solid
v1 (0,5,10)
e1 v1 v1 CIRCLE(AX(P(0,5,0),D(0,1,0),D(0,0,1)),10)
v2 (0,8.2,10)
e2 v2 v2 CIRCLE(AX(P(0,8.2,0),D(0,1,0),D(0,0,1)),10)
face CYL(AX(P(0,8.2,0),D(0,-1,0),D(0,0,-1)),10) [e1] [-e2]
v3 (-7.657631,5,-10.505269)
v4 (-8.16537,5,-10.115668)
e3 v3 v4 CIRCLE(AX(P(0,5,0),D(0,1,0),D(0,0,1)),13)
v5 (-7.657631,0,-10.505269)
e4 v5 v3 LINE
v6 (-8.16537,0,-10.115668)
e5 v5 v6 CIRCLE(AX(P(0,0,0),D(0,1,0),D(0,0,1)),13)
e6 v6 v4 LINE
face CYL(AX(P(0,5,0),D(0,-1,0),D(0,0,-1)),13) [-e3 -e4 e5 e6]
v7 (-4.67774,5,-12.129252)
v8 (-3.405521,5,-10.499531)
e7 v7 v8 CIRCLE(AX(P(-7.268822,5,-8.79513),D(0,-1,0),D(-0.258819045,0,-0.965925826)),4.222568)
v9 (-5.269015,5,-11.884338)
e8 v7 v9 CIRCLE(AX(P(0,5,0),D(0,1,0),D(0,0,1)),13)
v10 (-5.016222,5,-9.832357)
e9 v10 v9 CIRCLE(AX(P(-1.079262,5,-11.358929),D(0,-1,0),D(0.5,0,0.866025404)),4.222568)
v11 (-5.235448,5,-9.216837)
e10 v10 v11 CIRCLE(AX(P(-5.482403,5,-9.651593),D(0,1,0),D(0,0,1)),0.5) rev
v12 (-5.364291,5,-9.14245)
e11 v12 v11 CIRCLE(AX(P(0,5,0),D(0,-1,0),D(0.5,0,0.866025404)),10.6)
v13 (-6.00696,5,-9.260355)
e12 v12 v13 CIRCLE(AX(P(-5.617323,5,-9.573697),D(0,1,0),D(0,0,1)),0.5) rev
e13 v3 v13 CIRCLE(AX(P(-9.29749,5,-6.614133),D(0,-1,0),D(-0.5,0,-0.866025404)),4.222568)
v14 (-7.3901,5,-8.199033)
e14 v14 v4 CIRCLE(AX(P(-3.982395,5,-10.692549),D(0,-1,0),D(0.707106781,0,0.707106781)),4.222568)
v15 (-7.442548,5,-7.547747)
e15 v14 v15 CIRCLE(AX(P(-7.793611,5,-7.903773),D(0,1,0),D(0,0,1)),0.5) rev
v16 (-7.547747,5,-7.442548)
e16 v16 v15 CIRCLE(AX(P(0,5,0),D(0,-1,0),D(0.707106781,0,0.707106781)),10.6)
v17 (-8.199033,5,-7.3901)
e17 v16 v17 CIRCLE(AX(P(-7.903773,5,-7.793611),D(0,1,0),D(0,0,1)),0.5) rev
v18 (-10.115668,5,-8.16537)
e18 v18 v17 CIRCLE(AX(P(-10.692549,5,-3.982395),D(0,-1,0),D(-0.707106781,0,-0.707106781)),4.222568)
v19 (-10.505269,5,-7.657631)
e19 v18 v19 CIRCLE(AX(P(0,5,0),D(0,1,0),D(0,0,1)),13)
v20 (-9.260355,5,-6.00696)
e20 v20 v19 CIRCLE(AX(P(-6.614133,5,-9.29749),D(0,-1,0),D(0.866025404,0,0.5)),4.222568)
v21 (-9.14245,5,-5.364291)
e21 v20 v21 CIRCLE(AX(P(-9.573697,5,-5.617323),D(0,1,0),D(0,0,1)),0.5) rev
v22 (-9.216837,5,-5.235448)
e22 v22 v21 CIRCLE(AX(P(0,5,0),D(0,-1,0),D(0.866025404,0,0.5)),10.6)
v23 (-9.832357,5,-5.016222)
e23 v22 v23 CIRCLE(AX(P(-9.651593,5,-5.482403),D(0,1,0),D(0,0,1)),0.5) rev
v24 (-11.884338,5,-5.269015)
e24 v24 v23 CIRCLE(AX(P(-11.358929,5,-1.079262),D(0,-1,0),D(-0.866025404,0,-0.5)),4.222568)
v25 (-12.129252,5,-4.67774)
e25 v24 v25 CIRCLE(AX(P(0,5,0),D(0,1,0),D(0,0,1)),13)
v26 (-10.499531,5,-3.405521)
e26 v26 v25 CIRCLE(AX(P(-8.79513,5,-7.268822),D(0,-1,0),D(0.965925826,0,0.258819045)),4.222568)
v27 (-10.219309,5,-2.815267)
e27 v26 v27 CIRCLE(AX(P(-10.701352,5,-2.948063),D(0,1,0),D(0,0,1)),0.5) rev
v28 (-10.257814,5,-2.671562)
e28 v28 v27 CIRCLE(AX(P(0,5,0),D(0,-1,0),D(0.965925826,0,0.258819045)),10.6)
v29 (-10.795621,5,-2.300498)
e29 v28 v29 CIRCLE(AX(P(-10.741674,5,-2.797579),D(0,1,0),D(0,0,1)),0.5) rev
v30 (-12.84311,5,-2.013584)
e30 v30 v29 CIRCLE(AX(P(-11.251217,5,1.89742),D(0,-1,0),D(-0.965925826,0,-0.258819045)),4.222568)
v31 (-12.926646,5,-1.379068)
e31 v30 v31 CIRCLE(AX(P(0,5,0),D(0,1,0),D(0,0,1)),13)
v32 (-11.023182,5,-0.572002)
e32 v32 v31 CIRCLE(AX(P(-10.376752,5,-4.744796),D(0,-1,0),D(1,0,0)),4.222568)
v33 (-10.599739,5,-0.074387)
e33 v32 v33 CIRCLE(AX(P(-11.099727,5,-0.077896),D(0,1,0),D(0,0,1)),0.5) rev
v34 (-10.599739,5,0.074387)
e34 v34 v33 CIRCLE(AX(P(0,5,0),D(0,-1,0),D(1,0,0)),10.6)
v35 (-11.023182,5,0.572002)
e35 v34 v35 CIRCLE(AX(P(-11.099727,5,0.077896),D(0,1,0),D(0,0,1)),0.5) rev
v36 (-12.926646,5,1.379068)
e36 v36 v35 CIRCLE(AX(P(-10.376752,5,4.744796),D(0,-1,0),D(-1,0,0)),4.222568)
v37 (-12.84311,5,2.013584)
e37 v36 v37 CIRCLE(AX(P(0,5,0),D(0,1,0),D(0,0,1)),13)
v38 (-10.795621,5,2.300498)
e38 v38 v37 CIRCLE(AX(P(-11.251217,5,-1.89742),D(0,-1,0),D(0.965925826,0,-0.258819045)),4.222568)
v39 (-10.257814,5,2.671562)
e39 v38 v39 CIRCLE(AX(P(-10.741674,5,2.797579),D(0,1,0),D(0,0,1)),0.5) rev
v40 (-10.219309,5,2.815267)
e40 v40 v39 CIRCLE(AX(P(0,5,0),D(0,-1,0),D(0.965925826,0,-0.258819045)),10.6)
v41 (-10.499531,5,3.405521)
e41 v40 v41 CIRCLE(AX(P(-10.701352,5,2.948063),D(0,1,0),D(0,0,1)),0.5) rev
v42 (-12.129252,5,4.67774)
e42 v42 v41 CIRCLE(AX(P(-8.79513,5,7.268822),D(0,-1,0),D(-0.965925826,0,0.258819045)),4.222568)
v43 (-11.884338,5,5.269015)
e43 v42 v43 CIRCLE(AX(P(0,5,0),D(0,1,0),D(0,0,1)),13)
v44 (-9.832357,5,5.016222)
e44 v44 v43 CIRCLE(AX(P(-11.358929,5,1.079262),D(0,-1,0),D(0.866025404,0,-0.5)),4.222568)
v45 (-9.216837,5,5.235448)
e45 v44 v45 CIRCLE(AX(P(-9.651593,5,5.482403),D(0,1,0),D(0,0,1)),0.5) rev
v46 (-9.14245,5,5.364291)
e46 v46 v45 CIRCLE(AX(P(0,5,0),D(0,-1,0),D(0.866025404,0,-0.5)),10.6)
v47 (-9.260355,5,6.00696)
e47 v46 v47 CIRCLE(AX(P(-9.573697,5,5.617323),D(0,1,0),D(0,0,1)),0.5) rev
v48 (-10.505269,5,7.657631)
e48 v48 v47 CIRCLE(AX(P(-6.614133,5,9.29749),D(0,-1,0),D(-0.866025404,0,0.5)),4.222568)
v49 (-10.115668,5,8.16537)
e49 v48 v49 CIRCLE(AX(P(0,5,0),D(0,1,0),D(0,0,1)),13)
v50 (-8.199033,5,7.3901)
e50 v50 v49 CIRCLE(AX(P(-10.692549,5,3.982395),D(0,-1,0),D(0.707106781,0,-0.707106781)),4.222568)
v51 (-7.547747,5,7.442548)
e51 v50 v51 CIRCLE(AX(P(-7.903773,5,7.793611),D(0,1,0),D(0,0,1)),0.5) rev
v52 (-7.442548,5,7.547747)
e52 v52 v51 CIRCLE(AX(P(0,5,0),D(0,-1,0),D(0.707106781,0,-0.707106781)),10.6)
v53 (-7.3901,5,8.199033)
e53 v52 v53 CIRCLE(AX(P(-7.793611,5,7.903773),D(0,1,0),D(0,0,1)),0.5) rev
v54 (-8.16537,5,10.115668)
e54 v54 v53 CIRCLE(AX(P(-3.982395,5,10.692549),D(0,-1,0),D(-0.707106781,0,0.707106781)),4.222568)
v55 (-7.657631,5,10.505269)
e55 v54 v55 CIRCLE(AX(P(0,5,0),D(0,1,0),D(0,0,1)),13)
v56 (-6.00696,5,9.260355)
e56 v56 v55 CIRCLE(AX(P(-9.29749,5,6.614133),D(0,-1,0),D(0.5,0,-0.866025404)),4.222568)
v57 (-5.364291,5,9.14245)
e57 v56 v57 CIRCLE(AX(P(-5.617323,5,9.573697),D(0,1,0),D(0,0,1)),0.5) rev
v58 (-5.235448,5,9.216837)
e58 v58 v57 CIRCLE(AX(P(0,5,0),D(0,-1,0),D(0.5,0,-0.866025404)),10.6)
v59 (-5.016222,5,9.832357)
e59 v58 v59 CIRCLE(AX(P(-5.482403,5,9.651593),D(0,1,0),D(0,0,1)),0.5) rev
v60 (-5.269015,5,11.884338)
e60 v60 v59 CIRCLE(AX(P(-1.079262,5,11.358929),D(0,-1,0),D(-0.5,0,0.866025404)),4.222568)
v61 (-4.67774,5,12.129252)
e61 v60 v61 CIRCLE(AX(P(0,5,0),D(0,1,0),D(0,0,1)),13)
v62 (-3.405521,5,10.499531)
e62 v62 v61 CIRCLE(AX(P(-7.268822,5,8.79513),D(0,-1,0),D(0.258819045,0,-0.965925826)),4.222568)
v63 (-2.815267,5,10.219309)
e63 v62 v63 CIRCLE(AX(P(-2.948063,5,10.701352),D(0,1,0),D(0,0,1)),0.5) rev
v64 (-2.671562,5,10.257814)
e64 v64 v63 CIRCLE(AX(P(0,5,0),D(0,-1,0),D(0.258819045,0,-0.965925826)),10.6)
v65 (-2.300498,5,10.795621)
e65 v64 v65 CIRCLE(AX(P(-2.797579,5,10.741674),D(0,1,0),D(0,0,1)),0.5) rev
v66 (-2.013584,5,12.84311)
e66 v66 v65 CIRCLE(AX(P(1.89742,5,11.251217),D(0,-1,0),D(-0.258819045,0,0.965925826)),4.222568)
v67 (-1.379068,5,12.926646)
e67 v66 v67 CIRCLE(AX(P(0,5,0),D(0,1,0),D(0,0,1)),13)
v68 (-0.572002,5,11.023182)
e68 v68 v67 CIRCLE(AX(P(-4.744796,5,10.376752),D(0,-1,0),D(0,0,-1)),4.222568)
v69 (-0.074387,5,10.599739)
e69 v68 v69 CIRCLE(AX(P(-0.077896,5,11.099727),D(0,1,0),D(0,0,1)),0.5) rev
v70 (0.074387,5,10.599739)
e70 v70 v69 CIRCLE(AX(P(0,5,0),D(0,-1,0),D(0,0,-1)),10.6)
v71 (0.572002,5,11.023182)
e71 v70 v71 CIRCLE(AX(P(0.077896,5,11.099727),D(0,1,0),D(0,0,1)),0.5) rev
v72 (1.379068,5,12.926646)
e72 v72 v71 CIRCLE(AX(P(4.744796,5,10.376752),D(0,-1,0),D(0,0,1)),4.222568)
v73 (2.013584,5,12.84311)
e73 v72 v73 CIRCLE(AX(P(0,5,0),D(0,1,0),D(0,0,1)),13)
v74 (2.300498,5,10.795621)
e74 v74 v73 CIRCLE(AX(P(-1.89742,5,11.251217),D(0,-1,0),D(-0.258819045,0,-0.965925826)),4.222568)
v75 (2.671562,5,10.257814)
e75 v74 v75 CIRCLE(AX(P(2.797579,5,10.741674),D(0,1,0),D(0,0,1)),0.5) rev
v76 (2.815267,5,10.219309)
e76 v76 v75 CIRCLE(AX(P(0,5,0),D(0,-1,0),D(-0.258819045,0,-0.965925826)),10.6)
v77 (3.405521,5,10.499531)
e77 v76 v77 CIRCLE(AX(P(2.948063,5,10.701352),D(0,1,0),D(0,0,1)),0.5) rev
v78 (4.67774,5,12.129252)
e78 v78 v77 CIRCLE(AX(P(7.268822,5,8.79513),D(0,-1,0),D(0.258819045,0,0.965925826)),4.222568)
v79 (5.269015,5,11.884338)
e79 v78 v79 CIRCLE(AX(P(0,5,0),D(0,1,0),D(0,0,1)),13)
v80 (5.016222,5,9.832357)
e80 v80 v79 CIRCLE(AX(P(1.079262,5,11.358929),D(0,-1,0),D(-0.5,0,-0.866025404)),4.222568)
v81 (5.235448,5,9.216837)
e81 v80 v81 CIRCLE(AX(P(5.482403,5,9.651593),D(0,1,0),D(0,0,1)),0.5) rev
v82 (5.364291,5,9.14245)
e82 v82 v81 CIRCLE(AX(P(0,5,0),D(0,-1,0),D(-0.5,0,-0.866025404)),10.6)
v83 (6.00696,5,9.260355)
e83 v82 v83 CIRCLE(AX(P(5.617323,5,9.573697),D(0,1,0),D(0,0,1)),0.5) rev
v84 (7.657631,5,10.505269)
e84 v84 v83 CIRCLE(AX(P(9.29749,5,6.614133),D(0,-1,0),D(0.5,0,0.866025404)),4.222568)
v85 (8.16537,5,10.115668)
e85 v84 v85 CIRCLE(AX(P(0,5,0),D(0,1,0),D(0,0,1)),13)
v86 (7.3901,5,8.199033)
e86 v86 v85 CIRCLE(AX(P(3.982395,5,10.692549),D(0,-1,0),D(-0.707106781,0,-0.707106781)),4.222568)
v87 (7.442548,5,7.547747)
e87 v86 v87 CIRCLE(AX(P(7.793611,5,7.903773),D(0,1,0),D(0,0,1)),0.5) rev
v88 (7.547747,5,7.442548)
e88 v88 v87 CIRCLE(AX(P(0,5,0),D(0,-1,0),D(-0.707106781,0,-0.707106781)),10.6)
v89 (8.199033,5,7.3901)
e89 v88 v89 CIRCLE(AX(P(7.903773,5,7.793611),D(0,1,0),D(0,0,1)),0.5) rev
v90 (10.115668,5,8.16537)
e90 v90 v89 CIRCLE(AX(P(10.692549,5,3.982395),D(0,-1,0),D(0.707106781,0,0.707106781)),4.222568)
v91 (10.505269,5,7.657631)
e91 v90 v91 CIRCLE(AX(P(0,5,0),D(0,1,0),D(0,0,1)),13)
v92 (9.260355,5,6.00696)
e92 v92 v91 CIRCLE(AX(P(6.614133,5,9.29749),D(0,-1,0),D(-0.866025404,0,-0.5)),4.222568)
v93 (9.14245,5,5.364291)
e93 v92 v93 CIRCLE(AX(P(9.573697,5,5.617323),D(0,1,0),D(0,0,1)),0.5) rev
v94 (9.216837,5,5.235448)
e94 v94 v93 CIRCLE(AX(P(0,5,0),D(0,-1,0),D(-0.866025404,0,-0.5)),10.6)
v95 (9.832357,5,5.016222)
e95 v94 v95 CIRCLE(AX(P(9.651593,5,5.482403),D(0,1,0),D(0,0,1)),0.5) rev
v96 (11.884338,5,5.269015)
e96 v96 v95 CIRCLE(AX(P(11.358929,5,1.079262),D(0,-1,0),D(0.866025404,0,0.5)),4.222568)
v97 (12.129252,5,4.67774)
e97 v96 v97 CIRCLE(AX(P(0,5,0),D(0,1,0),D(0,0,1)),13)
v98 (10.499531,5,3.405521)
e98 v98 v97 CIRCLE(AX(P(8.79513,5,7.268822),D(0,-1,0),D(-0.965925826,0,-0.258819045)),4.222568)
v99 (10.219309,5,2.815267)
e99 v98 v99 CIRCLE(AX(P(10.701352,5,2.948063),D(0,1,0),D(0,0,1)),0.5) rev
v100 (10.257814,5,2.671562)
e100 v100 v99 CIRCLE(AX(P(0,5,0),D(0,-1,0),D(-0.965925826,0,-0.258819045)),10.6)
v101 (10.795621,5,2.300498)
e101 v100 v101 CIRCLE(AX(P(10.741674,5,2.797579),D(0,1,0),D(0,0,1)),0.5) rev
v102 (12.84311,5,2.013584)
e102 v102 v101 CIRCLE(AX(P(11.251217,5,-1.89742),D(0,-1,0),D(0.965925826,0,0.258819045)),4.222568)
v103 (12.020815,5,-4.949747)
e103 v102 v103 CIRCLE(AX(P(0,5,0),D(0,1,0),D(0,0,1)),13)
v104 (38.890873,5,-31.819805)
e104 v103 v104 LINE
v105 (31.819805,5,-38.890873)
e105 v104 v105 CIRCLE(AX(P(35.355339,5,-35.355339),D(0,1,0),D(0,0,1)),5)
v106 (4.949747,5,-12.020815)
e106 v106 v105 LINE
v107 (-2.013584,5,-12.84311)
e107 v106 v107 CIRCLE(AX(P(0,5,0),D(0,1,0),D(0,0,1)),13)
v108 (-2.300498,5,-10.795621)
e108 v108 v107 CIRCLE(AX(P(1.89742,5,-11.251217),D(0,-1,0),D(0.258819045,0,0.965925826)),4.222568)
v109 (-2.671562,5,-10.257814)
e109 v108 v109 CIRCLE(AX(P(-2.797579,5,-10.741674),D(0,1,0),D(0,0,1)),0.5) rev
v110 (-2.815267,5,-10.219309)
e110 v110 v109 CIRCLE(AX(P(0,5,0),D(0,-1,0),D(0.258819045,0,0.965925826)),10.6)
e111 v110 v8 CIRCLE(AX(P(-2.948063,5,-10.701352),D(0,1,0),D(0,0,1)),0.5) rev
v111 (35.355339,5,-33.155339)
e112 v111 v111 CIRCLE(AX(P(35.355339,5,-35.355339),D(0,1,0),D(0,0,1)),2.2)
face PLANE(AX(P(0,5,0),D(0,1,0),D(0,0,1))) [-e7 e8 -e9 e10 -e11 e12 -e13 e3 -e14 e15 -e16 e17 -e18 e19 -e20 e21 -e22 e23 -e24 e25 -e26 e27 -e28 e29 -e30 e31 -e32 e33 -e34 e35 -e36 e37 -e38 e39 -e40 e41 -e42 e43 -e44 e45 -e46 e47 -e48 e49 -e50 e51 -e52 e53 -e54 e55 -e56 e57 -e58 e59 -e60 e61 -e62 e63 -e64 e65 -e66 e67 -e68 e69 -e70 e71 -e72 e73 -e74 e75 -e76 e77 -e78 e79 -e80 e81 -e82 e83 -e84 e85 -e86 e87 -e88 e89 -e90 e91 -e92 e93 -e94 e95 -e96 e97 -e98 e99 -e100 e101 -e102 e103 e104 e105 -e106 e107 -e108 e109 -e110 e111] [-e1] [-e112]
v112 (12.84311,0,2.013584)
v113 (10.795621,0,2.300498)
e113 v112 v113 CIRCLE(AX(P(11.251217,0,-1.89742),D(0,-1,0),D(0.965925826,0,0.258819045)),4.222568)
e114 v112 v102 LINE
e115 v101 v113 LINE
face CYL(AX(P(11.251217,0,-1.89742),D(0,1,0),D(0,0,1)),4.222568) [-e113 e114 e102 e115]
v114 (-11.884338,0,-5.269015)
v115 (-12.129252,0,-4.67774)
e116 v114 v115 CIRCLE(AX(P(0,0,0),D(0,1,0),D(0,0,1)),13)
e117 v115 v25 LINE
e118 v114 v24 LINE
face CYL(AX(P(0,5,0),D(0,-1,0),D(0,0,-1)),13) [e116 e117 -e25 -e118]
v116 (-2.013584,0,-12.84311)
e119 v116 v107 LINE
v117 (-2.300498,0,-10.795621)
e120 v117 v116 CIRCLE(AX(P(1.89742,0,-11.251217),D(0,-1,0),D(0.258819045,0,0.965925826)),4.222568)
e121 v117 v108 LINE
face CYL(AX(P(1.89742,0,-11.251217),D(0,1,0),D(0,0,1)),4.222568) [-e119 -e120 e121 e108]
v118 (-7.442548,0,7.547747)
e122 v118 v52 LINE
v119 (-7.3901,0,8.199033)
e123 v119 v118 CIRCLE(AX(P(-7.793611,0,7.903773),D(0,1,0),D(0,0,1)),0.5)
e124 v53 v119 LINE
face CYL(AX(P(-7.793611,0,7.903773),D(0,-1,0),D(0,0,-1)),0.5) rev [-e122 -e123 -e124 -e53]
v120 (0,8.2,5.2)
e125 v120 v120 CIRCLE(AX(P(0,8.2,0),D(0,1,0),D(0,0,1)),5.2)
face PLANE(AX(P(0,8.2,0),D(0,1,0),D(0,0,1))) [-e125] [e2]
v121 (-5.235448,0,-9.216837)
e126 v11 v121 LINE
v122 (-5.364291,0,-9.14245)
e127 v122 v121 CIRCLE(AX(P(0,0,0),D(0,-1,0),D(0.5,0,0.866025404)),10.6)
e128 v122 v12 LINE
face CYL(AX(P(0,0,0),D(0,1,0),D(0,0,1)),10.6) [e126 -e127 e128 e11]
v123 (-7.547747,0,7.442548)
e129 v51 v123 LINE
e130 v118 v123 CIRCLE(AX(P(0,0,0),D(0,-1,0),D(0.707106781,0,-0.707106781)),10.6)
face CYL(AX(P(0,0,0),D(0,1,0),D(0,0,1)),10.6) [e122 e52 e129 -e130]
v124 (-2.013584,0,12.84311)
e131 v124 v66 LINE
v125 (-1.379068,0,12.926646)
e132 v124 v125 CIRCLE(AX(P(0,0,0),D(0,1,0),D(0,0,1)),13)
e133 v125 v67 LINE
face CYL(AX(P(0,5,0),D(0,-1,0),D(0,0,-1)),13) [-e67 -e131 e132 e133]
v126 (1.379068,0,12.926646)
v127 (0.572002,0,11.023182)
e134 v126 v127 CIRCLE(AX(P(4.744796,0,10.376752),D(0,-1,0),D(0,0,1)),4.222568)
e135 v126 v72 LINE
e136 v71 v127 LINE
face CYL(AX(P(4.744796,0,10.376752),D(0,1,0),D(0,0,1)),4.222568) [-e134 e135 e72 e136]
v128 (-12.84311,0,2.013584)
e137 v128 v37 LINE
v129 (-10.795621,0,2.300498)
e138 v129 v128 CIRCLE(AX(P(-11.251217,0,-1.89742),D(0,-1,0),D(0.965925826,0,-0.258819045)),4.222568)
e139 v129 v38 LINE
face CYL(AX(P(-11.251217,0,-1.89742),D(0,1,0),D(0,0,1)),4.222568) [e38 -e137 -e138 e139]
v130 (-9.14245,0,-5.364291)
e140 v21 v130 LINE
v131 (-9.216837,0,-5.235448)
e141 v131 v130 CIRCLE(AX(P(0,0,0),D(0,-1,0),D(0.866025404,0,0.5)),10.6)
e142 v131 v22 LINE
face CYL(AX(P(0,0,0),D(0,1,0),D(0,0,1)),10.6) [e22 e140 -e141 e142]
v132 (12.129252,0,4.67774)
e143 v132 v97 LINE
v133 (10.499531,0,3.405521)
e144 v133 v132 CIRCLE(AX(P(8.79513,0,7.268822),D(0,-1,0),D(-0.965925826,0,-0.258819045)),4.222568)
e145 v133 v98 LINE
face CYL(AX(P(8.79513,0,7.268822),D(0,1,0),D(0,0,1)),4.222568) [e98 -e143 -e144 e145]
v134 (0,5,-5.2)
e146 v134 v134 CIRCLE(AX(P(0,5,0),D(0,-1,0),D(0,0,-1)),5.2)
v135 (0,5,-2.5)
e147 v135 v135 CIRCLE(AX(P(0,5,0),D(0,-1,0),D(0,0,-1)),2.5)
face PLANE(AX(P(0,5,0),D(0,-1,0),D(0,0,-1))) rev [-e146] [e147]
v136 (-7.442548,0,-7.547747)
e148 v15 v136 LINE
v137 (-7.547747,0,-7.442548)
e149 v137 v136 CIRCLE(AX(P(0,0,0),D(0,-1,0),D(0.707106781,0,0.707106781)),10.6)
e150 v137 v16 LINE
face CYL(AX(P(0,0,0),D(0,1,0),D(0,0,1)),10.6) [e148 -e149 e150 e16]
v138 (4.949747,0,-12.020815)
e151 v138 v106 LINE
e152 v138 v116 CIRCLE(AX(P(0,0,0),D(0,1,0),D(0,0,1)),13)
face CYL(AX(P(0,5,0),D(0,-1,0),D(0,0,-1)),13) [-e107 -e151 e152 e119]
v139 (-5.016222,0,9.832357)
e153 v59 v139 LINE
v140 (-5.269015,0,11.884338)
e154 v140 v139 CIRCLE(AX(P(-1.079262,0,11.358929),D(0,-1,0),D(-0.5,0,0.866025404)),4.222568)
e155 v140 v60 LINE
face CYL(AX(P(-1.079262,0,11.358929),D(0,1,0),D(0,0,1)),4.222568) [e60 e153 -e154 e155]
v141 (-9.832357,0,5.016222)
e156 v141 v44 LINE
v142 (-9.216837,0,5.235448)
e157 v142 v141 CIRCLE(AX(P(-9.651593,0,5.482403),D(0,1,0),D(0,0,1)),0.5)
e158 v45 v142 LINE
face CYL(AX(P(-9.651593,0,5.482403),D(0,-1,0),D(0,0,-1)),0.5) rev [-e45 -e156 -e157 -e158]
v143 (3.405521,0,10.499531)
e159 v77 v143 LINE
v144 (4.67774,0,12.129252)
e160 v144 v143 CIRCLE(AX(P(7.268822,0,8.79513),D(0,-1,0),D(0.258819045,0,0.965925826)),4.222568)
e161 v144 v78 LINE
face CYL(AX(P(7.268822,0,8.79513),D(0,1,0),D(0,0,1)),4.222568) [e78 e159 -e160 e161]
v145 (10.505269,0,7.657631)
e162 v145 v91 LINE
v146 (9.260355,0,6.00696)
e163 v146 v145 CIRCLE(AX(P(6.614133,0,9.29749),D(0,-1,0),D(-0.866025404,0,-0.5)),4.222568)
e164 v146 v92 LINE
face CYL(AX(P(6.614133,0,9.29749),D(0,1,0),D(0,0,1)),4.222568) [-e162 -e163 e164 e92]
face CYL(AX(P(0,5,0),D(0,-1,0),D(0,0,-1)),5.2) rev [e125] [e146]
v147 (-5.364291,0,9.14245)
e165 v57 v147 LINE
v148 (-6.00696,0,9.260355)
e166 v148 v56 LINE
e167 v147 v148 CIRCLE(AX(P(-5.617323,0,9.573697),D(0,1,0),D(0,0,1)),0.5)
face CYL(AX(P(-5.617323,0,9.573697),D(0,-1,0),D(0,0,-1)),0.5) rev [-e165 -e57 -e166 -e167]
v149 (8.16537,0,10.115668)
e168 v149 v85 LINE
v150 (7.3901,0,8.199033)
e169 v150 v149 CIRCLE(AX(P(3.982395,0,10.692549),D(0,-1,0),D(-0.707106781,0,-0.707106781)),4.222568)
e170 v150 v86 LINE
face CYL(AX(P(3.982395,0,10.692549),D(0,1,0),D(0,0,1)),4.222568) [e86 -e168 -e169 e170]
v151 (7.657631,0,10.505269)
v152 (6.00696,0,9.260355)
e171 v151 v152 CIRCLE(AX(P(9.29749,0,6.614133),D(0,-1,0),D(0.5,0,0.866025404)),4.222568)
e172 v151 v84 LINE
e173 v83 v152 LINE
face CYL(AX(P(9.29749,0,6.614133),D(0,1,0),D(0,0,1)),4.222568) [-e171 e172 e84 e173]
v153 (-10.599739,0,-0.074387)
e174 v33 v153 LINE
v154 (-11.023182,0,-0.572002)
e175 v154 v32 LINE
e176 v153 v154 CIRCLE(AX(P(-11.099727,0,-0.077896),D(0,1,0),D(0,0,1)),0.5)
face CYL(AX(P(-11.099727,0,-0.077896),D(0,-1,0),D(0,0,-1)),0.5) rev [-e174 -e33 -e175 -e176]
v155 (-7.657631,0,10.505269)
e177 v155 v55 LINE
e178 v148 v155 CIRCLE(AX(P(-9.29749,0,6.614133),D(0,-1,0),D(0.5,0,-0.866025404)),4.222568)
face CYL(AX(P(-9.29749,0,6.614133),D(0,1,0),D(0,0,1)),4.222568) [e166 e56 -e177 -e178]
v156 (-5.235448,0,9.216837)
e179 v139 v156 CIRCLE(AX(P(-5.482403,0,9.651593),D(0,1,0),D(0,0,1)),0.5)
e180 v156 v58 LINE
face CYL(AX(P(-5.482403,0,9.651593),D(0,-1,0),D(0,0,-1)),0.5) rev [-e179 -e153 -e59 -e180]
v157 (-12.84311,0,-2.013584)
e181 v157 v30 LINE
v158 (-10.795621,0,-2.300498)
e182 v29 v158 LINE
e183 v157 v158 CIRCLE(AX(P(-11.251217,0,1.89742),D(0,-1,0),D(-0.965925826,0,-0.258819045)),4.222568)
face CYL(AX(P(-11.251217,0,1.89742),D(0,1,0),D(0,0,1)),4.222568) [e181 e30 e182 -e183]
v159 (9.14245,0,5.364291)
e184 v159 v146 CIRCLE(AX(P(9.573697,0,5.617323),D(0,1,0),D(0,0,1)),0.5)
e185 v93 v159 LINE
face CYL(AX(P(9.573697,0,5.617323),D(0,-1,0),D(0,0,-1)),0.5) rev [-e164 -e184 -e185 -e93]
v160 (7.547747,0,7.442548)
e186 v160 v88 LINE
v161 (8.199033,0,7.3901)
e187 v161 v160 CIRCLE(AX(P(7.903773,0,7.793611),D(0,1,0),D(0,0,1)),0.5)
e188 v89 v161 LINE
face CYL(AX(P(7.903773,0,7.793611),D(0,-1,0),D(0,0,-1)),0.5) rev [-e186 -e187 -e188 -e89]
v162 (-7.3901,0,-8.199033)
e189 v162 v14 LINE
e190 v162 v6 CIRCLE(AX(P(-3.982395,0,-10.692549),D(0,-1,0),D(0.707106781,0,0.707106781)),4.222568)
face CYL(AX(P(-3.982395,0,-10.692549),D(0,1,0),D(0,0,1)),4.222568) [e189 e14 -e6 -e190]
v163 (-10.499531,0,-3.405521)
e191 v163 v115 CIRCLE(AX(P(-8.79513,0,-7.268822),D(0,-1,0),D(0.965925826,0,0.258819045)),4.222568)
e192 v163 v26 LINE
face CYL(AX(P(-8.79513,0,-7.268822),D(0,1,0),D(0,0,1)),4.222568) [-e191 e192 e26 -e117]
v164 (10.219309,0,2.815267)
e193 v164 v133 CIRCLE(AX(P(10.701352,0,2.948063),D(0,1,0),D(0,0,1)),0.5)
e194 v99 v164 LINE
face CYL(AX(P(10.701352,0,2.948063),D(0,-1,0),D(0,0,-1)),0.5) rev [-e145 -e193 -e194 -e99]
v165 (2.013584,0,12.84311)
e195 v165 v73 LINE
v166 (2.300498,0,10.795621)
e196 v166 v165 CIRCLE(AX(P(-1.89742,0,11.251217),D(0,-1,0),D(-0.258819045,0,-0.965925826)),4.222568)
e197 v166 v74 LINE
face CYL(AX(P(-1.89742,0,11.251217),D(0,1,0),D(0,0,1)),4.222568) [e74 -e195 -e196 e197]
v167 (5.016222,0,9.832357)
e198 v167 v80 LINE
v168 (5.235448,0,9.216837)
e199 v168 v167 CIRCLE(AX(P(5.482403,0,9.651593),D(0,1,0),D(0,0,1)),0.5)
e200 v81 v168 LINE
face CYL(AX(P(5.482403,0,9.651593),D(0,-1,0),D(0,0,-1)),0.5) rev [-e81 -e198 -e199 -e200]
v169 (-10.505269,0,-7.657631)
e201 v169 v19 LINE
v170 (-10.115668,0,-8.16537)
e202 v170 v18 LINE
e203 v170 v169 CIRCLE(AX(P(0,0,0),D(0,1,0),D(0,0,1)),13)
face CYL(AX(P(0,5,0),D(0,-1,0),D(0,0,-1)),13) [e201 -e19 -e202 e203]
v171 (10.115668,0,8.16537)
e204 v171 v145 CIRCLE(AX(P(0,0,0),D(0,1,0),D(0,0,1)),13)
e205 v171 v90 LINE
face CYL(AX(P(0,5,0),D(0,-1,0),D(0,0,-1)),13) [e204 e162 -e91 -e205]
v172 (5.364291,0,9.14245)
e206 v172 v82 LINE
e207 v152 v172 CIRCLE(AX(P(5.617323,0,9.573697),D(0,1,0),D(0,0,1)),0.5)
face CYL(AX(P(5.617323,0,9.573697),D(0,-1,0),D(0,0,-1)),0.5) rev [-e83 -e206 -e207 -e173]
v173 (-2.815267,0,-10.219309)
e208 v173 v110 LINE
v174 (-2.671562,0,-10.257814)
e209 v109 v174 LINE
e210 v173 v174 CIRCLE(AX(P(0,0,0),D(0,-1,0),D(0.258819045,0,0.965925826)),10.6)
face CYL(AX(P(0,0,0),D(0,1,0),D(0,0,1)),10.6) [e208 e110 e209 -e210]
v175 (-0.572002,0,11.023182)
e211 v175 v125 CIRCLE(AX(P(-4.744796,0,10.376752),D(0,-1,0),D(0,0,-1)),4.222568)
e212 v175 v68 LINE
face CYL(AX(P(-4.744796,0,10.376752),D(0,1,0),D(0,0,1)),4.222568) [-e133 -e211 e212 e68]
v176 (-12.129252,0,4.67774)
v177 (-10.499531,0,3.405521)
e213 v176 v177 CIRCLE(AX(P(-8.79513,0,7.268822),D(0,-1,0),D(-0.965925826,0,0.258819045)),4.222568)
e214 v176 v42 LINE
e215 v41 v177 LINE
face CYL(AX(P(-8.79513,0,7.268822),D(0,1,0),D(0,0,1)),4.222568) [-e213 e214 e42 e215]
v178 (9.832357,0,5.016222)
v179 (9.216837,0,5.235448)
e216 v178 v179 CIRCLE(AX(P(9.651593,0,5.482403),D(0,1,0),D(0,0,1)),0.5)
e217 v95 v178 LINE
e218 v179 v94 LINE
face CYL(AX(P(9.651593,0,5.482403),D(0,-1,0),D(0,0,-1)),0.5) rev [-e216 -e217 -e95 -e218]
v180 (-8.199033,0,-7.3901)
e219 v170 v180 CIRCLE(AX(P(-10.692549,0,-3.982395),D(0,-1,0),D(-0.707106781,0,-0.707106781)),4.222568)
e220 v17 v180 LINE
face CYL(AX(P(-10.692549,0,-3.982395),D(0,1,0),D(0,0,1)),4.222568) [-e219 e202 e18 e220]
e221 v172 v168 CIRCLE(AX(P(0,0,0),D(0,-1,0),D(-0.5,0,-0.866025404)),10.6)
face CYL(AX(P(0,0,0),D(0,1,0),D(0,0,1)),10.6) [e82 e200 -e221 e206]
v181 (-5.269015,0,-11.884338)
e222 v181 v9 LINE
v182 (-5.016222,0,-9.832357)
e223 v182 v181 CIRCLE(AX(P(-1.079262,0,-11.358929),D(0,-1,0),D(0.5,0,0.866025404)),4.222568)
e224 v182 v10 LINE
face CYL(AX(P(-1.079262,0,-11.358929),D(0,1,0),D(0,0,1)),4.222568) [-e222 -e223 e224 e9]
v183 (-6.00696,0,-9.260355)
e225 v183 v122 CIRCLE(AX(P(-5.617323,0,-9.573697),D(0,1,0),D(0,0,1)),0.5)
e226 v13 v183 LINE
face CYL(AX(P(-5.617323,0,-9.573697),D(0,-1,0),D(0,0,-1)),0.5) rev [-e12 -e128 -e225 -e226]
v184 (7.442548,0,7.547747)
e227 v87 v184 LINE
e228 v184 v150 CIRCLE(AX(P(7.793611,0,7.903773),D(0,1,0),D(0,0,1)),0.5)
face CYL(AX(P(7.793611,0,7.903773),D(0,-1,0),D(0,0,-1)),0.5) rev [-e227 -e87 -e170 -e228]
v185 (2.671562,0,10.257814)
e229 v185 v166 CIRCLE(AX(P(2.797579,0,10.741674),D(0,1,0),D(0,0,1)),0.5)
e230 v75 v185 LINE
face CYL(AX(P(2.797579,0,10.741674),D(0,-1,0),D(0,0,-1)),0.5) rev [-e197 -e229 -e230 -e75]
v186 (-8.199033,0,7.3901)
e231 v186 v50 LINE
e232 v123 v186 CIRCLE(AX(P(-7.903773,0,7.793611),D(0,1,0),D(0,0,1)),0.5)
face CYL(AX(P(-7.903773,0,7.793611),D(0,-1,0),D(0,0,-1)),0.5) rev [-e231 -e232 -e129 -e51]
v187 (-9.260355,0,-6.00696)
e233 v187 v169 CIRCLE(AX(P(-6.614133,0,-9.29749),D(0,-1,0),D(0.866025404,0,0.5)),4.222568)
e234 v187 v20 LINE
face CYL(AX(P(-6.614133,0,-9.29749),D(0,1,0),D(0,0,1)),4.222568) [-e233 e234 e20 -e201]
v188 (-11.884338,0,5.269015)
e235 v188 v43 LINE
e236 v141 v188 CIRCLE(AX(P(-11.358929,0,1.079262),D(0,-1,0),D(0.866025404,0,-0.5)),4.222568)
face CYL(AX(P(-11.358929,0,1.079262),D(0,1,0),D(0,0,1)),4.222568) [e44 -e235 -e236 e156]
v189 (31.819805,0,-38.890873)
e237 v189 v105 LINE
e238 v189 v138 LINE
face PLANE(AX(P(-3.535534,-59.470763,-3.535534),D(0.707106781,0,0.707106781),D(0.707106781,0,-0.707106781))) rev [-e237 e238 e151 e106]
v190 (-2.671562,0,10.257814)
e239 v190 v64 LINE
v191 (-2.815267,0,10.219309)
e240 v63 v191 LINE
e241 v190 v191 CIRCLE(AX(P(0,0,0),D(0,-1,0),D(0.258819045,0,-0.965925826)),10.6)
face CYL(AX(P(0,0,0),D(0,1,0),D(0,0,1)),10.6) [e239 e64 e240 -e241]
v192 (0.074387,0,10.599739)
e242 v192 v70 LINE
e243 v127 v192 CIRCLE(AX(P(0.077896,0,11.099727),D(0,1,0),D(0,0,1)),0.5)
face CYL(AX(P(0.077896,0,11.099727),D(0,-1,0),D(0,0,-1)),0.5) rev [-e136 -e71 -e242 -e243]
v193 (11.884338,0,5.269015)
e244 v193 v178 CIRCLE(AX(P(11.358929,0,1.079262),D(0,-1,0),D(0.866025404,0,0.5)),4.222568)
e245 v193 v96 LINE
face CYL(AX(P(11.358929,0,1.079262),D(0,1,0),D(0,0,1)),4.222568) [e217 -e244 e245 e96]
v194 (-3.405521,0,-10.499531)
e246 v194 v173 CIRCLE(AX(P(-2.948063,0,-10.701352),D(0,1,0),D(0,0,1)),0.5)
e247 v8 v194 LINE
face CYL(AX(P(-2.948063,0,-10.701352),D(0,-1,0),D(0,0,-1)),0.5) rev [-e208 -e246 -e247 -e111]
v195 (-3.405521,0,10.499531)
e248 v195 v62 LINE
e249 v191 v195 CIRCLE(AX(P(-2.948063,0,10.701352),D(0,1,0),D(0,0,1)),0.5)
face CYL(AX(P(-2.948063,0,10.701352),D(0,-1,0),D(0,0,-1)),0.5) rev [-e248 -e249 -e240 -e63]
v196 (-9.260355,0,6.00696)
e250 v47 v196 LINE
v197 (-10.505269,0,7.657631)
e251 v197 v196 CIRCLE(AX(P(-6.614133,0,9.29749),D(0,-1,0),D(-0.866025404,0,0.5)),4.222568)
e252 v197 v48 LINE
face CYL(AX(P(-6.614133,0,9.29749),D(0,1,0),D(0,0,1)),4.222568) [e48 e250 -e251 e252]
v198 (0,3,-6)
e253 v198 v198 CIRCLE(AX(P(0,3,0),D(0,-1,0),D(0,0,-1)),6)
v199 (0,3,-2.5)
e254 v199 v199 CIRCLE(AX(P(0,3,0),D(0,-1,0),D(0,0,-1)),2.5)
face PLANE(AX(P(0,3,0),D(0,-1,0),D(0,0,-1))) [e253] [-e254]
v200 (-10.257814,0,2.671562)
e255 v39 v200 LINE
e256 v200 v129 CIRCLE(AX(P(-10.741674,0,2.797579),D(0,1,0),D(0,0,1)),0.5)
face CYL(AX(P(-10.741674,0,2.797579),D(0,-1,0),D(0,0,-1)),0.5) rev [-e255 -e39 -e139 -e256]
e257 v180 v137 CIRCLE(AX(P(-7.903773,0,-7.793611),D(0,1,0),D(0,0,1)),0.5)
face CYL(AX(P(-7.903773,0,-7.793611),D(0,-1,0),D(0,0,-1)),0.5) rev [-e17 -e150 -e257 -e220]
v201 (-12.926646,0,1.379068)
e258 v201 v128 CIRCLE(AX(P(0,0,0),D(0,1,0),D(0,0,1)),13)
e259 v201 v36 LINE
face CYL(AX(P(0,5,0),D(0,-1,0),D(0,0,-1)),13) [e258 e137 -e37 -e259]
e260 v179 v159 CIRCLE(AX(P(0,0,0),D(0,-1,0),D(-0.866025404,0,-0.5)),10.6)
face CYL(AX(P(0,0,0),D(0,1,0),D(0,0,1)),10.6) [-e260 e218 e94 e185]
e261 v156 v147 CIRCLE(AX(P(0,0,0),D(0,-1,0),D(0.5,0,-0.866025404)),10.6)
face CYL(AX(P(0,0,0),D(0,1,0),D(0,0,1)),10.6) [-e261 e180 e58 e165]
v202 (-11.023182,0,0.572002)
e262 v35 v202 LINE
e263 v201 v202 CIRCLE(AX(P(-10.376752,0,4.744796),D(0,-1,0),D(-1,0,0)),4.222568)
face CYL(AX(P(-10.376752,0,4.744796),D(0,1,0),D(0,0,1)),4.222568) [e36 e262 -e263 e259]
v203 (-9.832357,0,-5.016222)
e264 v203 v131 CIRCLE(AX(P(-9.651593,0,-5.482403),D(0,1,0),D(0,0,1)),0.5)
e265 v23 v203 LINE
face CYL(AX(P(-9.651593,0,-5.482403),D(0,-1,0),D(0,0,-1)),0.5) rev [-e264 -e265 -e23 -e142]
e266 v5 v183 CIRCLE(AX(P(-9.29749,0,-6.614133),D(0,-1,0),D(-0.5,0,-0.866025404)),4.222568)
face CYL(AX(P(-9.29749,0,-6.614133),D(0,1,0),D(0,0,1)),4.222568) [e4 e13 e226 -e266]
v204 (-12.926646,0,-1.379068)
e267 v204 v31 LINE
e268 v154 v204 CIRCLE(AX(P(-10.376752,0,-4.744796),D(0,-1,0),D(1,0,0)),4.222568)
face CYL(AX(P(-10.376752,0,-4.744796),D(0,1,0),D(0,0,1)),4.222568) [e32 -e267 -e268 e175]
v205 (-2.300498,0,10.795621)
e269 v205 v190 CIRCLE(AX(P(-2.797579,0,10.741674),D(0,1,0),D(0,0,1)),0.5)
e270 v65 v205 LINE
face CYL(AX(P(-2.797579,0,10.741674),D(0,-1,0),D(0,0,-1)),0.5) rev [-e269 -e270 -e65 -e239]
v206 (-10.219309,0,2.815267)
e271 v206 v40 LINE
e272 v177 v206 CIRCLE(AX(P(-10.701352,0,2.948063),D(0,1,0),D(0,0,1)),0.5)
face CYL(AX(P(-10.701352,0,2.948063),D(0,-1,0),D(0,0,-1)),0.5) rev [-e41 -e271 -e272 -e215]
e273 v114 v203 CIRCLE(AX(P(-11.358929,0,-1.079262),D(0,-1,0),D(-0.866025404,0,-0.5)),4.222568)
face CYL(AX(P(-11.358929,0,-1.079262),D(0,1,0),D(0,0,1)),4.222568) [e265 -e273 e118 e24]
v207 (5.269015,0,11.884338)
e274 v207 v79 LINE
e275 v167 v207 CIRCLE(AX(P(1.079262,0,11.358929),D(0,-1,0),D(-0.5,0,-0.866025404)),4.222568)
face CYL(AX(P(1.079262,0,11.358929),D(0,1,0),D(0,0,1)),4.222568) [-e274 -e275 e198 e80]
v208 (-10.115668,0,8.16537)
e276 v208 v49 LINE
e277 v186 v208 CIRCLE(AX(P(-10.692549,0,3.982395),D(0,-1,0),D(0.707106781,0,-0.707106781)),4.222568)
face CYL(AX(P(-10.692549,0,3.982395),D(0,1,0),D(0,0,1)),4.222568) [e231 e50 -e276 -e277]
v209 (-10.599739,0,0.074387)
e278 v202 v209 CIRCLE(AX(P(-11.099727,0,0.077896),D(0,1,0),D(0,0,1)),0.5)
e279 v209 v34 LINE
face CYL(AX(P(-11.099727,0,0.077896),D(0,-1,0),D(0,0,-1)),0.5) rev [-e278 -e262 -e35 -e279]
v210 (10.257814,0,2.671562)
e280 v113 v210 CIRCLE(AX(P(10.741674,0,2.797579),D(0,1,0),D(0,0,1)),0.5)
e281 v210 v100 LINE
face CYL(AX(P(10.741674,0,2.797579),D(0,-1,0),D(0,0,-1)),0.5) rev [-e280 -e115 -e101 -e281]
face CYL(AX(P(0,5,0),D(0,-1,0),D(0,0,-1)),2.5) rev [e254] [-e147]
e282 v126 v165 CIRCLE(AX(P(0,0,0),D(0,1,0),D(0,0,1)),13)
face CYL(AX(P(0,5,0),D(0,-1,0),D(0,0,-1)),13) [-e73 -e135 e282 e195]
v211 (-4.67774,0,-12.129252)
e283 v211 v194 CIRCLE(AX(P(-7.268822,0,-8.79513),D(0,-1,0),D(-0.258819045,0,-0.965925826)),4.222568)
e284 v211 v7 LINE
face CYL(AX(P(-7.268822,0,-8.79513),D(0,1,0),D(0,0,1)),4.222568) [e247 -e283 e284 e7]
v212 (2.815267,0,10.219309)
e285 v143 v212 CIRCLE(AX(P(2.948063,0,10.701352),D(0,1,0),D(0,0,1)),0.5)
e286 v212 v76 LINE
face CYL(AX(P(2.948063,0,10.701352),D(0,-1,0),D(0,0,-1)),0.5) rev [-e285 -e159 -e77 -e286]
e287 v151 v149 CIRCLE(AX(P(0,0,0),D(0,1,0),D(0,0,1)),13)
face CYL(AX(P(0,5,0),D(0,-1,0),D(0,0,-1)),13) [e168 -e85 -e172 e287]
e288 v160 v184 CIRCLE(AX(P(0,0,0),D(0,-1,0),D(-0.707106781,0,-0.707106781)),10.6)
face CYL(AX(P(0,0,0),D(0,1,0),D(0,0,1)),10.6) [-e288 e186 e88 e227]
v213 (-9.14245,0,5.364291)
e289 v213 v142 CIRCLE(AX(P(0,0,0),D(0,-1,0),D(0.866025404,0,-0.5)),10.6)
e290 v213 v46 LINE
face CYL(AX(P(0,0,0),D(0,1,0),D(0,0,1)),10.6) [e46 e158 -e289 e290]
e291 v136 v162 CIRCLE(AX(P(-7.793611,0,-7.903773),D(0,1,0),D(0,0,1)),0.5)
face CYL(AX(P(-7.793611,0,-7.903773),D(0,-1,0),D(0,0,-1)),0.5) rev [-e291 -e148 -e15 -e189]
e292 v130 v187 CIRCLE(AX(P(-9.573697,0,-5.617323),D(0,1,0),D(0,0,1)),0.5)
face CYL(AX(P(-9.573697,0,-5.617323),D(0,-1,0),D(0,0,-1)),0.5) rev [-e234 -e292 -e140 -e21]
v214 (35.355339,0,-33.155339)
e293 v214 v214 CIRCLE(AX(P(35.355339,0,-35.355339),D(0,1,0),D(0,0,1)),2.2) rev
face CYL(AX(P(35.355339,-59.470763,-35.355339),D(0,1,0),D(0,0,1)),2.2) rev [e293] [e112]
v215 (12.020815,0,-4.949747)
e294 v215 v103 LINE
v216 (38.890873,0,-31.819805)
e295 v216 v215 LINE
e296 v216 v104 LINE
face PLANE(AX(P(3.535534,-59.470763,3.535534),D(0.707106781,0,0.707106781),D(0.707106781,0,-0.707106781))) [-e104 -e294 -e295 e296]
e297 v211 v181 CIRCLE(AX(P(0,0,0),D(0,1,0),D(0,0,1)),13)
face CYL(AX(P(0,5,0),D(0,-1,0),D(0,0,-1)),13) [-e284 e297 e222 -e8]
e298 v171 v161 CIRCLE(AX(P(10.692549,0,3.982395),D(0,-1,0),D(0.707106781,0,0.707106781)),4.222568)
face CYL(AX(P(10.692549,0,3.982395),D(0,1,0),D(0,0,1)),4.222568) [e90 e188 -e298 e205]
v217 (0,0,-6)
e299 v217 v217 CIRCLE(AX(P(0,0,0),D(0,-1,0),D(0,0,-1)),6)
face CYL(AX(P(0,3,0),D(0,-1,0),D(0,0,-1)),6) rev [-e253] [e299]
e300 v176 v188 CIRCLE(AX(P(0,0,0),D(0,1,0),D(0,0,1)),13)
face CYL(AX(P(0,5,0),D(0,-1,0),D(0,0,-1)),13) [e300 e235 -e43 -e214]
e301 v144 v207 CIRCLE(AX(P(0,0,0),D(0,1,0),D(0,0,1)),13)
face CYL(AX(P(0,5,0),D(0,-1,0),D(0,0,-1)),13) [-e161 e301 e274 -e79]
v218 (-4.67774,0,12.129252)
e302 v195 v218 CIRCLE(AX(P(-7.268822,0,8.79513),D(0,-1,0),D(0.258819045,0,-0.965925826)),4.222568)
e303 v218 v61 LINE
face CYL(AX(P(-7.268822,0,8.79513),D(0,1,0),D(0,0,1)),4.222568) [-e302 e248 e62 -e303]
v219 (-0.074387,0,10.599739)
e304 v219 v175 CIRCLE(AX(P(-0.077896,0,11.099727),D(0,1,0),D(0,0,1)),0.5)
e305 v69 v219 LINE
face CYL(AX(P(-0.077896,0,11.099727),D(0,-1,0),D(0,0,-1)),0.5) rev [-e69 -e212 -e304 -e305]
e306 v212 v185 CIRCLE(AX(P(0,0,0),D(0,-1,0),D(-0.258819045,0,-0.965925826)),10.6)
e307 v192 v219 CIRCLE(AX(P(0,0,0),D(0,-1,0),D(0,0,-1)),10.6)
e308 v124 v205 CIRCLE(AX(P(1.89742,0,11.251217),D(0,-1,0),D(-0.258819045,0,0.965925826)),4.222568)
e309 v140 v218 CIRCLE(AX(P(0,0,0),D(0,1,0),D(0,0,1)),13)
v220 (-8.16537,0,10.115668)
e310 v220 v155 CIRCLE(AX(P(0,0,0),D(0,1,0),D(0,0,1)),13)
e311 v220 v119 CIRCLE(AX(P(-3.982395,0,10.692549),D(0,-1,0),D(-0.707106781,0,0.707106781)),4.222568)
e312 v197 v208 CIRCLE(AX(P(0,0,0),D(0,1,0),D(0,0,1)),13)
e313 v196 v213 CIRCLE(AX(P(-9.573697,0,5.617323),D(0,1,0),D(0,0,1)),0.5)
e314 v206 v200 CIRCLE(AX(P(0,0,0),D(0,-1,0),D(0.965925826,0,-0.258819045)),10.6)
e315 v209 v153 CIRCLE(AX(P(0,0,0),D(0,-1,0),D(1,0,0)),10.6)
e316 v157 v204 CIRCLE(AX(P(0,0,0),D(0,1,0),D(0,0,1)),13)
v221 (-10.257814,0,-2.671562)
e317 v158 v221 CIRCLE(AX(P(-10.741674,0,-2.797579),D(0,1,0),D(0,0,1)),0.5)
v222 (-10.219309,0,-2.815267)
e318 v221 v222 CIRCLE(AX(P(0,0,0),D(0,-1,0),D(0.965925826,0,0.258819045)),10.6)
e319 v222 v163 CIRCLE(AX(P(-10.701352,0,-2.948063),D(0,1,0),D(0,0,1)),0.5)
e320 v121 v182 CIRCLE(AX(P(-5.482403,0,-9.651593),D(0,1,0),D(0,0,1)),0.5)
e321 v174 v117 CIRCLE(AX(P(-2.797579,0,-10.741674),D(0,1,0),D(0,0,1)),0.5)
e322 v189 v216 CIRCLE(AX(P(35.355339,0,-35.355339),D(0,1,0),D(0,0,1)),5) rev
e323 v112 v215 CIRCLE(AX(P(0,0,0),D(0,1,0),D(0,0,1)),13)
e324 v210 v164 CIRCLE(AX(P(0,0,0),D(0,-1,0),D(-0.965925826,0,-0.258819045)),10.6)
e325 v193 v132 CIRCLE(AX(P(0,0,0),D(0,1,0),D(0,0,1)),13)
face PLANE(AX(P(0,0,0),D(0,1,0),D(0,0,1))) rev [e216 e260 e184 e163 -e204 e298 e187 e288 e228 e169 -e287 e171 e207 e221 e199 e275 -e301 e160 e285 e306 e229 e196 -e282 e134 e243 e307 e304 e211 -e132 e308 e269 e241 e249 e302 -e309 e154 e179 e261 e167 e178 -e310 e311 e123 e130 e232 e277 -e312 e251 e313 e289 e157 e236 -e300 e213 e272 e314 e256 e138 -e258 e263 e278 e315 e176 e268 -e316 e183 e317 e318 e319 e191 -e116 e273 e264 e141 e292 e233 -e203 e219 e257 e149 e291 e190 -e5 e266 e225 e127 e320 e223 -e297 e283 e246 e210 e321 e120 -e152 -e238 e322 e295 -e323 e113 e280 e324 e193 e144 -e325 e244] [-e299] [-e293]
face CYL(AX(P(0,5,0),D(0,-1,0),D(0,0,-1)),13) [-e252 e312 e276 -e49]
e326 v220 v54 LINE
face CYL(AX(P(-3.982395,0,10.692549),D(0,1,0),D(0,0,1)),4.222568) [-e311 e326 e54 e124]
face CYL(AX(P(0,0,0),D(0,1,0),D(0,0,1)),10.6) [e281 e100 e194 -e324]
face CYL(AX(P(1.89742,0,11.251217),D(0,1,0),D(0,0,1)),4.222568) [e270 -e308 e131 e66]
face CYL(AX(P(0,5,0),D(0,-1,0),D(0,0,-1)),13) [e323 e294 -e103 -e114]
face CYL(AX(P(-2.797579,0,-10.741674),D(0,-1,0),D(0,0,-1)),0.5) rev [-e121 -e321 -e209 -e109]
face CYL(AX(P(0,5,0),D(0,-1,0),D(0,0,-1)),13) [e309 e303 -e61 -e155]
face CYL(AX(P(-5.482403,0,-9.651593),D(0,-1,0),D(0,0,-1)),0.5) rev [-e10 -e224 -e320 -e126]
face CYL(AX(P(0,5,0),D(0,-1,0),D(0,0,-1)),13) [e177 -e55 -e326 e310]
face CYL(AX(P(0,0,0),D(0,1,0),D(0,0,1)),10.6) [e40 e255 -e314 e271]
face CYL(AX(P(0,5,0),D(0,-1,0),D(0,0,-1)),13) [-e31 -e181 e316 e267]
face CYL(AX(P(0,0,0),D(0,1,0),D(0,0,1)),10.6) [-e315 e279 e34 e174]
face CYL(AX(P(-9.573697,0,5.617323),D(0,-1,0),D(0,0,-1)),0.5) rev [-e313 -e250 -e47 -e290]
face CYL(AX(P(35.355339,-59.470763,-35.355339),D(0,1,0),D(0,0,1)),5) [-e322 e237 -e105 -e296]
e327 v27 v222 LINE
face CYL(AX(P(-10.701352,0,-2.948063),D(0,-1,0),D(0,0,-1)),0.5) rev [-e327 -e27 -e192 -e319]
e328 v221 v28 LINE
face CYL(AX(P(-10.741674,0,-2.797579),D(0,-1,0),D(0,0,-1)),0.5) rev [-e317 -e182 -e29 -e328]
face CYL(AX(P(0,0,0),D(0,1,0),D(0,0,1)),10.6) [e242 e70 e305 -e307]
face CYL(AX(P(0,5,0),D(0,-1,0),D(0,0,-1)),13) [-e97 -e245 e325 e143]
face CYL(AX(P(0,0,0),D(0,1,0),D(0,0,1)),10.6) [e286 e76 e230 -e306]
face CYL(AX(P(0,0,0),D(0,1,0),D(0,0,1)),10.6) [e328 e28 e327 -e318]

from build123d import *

# Parameters (mm, degrees)
SKETCH2_R                = 13
SKETCH2_R_2              = 5.2
BOSS_EXTRUDE1_DEPTH      = 5
CUT_EXTRUDE1_DEPTH       = 20.052558883
FILLET1_R                = 0.5
CIRPATTERN1_COUNT        = 24
FILLET1_OF_CIRPATTERN1_R = 0.5
EXTRUDE_START            = -5
EXTRUDE_1_OUTLINE_R      = 2.2
EXTRUDE_1_DEPTH          = 5
SKETCH_5_R               = 10
SKETCH_5_R_2             = 5.2
EXTRUDE_2_DEPTH          = 3.2
SKETCH_6_R               = 6
CUT_EXTRUDE_1_DEPTH      = 3
SKETCH_7_R               = 5.2
SKETCH_7_R_2             = 2.5
EXTRUDE_3_DEPTH          = 2


# Read off the part's stored shape, not the designer's step: 凸台-拉伸1
with BuildPart() as part:
    # Sketch2 → Boss-Extrude1 (new body)
    with BuildSketch(Plane(origin=(0, 0, 0), x_dir=(1, 0, 0), z_dir=(0, 1, 0))):
        with Locations(Location((0, 0, 0), (0, 0, 270))):
            Circle(SKETCH2_R)
        with Locations(Location((0, 0, 0), (0, 0, 270))):
            Circle(SKETCH2_R_2, mode=Mode.SUBTRACT)
    extrude(amount=BOSS_EXTRUDE1_DEPTH)

    # Sketch3 → Cut-Extrude1 (cut, through all)
    with BuildSketch(Plane(origin=(0, 5, 0), x_dir=(1, 0, 0), z_dir=(0, 1, 0))):
        with BuildLine():
            ThreePointArc((0.527459192, 10.586868602), (0, 10.6), (-0.527459192, 10.586868602))
            ThreePointArc((-0.527459192, 10.586868602), (-0.776880215, 11.820955553), (-1.379068427, 12.926645747))
            ThreePointArc((-1.379068427, 12.926645747), (0, 13), (1.379068427, 12.926645747))
            ThreePointArc((1.379068427, 12.926645747), (0.776880215, 11.820955553), (0.527459192, 10.586868602))
        make_face()
    cut_extrude1 = extrude(amount=-CUT_EXTRUDE1_DEPTH, mode=Mode.SUBTRACT)

    # Fillet1
    fillet1_edges = [part.edges().sort_by_distance(p)[0] for p in [
        (-0.527459192, 2.5, -10.586868602),
        (0.527459192, 2.5, -10.586868602),
    ]]
    fillet(fillet1_edges, radius=FILLET1_R)

    # CirPattern1: Cut-Extrude1 ×24 about axis
    cirpattern1_axis = Axis((0, 0, 0), (0, 1, 0))
    for i in range(1, CIRPATTERN1_COUNT):
        add(cut_extrude1.rotate(cirpattern1_axis, i * 360 / CIRPATTERN1_COUNT), mode=Mode.SUBTRACT)

    # Fillet1 of CirPattern1
    fillet1_of_cirpattern1_edges = [part.edges().sort_by_distance(p)[0] for p in [
        (-3.249569678, 2.5, -10.089613318),
        (-2.230596767, 2.5, -10.362646287),
        (-5.750227361, 2.5, -8.90476756),
        (-4.836641242, 2.5, -9.432226752),
        (-7.859016551, 2.5, -7.113076609),
        (-7.113076609, 2.5, -7.859016551),
        (-9.432226752, 2.5, -4.836641242),
        (-8.90476756, 2.5, -5.750227361),
        (-10.362646287, 2.5, -2.230596767),
        (-10.089613318, 2.5, -3.249569678),
        (-10.586868602, 2.5, 0.527459192),
        (-10.586868602, 2.5, -0.527459192),
        (-10.089613318, 2.5, 3.249569678),
        (-10.362646287, 2.5, 2.230596767),
        (-8.90476756, 2.5, 5.750227361),
        (-9.432226752, 2.5, 4.836641242),
        (-7.113076609, 2.5, 7.859016551),
        (-7.859016551, 2.5, 7.113076609),
        (-4.836641242, 2.5, 9.432226752),
        (-5.750227361, 2.5, 8.90476756),
        (-2.230596767, 2.5, 10.362646287),
        (-3.249569678, 2.5, 10.089613318),
        (0.527459192, 2.5, 10.586868602),
        (-0.527459192, 2.5, 10.586868602),
        (3.249569678, 2.5, 10.089613318),
        (2.230596767, 2.5, 10.362646287),
        (5.750227361, 2.5, 8.90476756),
        (4.836641242, 2.5, 9.432226752),
        (7.859016551, 2.5, 7.113076609),
        (7.113076609, 2.5, 7.859016551),
        (9.432226752, 2.5, 4.836641242),
        (8.90476756, 2.5, 5.750227361),
        (10.362646287, 2.5, 2.230596767),
        (10.089613318, 2.5, 3.249569678),
        (10.586868602, 2.5, -0.527459192),
        (10.586868602, 2.5, 0.527459192),
        (10.089613318, 2.5, -3.249569678),
        (10.362646287, 2.5, -2.230596767),
        (8.90476756, 2.5, -5.750227361),
        (9.432226752, 2.5, -4.836641242),
        (7.113076609, 2.5, -7.859016551),
        (7.859016551, 2.5, -7.113076609),
        (4.836641242, 2.5, -9.432226752),
        (5.750227361, 2.5, -8.90476756),
        (2.230596767, 2.5, -10.362646287),
        (3.249569678, 2.5, -10.089613318),
    ]]
    fillet(fillet1_of_cirpattern1_edges, radius=FILLET1_OF_CIRPATTERN1_R)

    # 凸台-拉伸1 outline → 凸台-拉伸1 (add)
    # profile 1 of 5: a face of its own
    with BuildSketch(Plane(origin=(0, 5, 0), x_dir=(1, 0, 0), z_dir=(0, 1, 0)).offset(EXTRUDE_START)):
        with BuildLine():
            ThreePointArc((12.926645747, -1.379068427), (13, 0), (12.926645747, 1.379068427))
            ThreePointArc((12.926645747, 1.379068427), (12.025072485, 0.857236447), (11.02318205, 0.572002303))
            ThreePointArc((11.02318205, 0.572002303), (10.718934665, 0.401929215), (10.599738984, 0.074387285))
            ThreePointArc((10.599738984, 0.074387285), (10.6, 0), (10.599738984, -0.074387285))
            ThreePointArc((10.599738984, -0.074387285), (10.718934665, -0.401929215), (11.02318205, -0.572002303))
            ThreePointArc((11.02318205, -0.572002303), (12.025072485, -0.857236447), (12.926645747, -1.379068427))
        make_face()
    # profile 2 of 5: a face of its own
    with BuildSketch(Plane(origin=(0, 5, 0), x_dir=(1, 0, 0), z_dir=(0, 1, 0)).offset(EXTRUDE_START)):
        with BuildLine():
            ThreePointArc((12.843110147, 2.013584299), (12.557035741, 3.364647587), (12.129251801, 4.677739919))
            ThreePointArc((12.129251801, 4.677739919), (11.393458958, 3.940344601), (10.49953114, 3.405521249))
            ThreePointArc((10.49953114, 3.405521249), (10.249668888, 3.162498244), (10.219308791, 2.815266922))
            ThreePointArc((10.219308791, 2.815266922), (10.238813759, 2.743481878), (10.257814483, 2.671561723))
            ThreePointArc((10.257814483, 2.671561723), (10.457722759, 2.386030625), (10.79562132, 2.300497655))
            ThreePointArc((10.79562132, 2.300497655), (11.837197196, 2.284290955), (12.843110147, 2.013584299))
        make_face()
    # profile 3 of 5: a face of its own
    with BuildSketch(Plane(origin=(0, 5, 0), x_dir=(1, 0, 0), z_dir=(0, 1, 0)).offset(EXTRUDE_START)):
        with BuildLine():
            ThreePointArc((11.884337816, 5.269014582), (11.9536425, 5.109836689), (12.020815281, 4.949747468))
            Line((12.020815281, 4.949747468), (38.890872965, 31.819805153))
            ThreePointArc((38.890872965, 31.819805153), (38.890872965, 38.890872965), (31.819805153, 38.890872965))
            Line((31.819805153, 38.890872965), (4.949747468, 12.020815281))
            ThreePointArc((4.949747468, 12.020815281), (5.109836689, 11.9536425), (5.269014582, 11.884337816))
            ThreePointArc((5.269014582, 11.884337816), (5.270147703, 10.842636478), (5.0162225, 9.832356838))
            ThreePointArc((5.0162225, 9.832356838), (5.011386422, 9.483834329), (5.235448214, 9.216836876))
            ThreePointArc((5.235448214, 9.216836876), (5.3, 9.17986928), (5.364290771, 9.142449591))
            ThreePointArc((5.364290771, 9.142449591), (5.707548244, 9.081905114), (6.006959551, 9.260354535))
            ThreePointArc((6.006959551, 9.260354535), (6.754924783, 9.985400031), (7.657631165, 10.505269389))
            ThreePointArc((7.657631165, 10.505269389), (7.913898577, 10.313593424), (8.165370229, 10.115667502))
            ThreePointArc((8.165370229, 10.115667502), (7.896852594, 9.109168003), (7.390100071, 8.199033485))
            ThreePointArc((7.390100071, 8.199033485), (7.295224515, 7.863638262), (7.442547561, 7.547747068))
            ThreePointArc((7.442547561, 7.547747068), (7.495331881, 7.495331881), (7.547747068, 7.442547561))
            ThreePointArc((7.547747068, 7.442547561), (7.863638262, 7.295224515), (8.199033485, 7.390100071))
            ThreePointArc((8.199033485, 7.390100071), (9.109168003, 7.896852594), (10.115667502, 8.165370229))
            ThreePointArc((10.115667502, 8.165370229), (10.313593424, 7.913898577), (10.505269389, 7.657631165))
            ThreePointArc((10.505269389, 7.657631165), (9.985400031, 6.754924783), (9.260354535, 6.006959551))
            ThreePointArc((9.260354535, 6.006959551), (9.081905114, 5.707548244), (9.142449591, 5.364290771))
            ThreePointArc((9.142449591, 5.364290771), (9.17986928, 5.3), (9.216836876, 5.235448214))
            ThreePointArc((9.216836876, 5.235448214), (9.483834329, 5.011386422), (9.832356838, 5.0162225))
            ThreePointArc((9.832356838, 5.0162225), (10.842636478, 5.270147703), (11.884337816, 5.269014582))
        make_face()
        with Locations((35.355339059, 35.355339059)):
            Circle(EXTRUDE_1_OUTLINE_R, mode=Mode.SUBTRACT)
    # profile 4 of 5: a face of its own
    with BuildSketch(Plane(origin=(0, 5, 0), x_dir=(1, 0, 0), z_dir=(0, 1, 0)).offset(EXTRUDE_START)):
        with BuildLine():
            ThreePointArc((0.572002303, 11.02318205), (0.857236447, 12.025072485), (1.379068427, 12.926645747))
            ThreePointArc((1.379068427, 12.926645747), (0, 13), (-1.379068427, 12.926645747))
            ThreePointArc((-1.379068427, 12.926645747), (-0.857236447, 12.025072485), (-0.572002303, 11.02318205))
            ThreePointArc((-0.572002303, 11.02318205), (-0.401929215, 10.718934665), (-0.074387285, 10.599738984))
            ThreePointArc((-0.074387285, 10.599738984), (0, 10.6), (0.074387285, 10.599738984))
            ThreePointArc((0.074387285, 10.599738984), (0.401929215, 10.718934665), (0.572002303, 11.02318205))
        make_face()
    # profile 5 of 5: a face of its own
    with BuildSketch(Plane(origin=(0, 5, 0), x_dir=(1, 0, 0), z_dir=(0, 1, 0)).offset(EXTRUDE_START)):
        with BuildLine():
            ThreePointArc((3.405521249, 10.49953114), (3.940344601, 11.393458958), (4.677739919, 12.129251801))
            ThreePointArc((4.677739919, 12.129251801), (3.364647587, 12.557035741), (2.013584299, 12.843110147))
            ThreePointArc((2.013584299, 12.843110147), (2.284290955, 11.837197196), (2.300497655, 10.79562132))
            ThreePointArc((2.300497655, 10.79562132), (2.386030625, 10.457722759), (2.671561723, 10.257814483))
            ThreePointArc((2.671561723, 10.257814483), (2.743481878, 10.238813759), (2.815266922, 10.219308791))
            ThreePointArc((2.815266922, 10.219308791), (3.162498244, 10.249668888), (3.405521249, 10.49953114))
        make_face()
    extrude(amount=EXTRUDE_1_DEPTH)

    # 草图5 → 凸台-拉伸2 (add)
    with BuildSketch(Plane(origin=(0, 5, 0), x_dir=(1, 0, 0), z_dir=(0, 1, 0))):
        with Locations(Location((0, 0, 0), (0, 0, 270))):
            Circle(SKETCH_5_R)
        with Locations(Location((0, 0, 0), (0, 0, 270))):
            Circle(SKETCH_5_R_2, mode=Mode.SUBTRACT)
    extrude(amount=EXTRUDE_2_DEPTH)

    # 草图6 → 切除-拉伸1 (cut)
    with BuildSketch(Plane.XZ):
        with Locations(Location((0, 0, 0), (0, 0, 270))):
            Circle(SKETCH_6_R)
    extrude(amount=-CUT_EXTRUDE_1_DEPTH, mode=Mode.SUBTRACT)

    # 草图7 → 凸台-拉伸3 (add)
    with BuildSketch(Plane.XZ.offset(-3)):
        with Locations(Location((0, 0, 0), (0, 0, 270))):
            Circle(SKETCH_7_R)
        with Locations(Location((0, 0, 0), (0, 0, 270))):
            Circle(SKETCH_7_R_2, mode=Mode.SUBTRACT)
    extrude(amount=-EXTRUDE_3_DEPTH)


solid = part.part
